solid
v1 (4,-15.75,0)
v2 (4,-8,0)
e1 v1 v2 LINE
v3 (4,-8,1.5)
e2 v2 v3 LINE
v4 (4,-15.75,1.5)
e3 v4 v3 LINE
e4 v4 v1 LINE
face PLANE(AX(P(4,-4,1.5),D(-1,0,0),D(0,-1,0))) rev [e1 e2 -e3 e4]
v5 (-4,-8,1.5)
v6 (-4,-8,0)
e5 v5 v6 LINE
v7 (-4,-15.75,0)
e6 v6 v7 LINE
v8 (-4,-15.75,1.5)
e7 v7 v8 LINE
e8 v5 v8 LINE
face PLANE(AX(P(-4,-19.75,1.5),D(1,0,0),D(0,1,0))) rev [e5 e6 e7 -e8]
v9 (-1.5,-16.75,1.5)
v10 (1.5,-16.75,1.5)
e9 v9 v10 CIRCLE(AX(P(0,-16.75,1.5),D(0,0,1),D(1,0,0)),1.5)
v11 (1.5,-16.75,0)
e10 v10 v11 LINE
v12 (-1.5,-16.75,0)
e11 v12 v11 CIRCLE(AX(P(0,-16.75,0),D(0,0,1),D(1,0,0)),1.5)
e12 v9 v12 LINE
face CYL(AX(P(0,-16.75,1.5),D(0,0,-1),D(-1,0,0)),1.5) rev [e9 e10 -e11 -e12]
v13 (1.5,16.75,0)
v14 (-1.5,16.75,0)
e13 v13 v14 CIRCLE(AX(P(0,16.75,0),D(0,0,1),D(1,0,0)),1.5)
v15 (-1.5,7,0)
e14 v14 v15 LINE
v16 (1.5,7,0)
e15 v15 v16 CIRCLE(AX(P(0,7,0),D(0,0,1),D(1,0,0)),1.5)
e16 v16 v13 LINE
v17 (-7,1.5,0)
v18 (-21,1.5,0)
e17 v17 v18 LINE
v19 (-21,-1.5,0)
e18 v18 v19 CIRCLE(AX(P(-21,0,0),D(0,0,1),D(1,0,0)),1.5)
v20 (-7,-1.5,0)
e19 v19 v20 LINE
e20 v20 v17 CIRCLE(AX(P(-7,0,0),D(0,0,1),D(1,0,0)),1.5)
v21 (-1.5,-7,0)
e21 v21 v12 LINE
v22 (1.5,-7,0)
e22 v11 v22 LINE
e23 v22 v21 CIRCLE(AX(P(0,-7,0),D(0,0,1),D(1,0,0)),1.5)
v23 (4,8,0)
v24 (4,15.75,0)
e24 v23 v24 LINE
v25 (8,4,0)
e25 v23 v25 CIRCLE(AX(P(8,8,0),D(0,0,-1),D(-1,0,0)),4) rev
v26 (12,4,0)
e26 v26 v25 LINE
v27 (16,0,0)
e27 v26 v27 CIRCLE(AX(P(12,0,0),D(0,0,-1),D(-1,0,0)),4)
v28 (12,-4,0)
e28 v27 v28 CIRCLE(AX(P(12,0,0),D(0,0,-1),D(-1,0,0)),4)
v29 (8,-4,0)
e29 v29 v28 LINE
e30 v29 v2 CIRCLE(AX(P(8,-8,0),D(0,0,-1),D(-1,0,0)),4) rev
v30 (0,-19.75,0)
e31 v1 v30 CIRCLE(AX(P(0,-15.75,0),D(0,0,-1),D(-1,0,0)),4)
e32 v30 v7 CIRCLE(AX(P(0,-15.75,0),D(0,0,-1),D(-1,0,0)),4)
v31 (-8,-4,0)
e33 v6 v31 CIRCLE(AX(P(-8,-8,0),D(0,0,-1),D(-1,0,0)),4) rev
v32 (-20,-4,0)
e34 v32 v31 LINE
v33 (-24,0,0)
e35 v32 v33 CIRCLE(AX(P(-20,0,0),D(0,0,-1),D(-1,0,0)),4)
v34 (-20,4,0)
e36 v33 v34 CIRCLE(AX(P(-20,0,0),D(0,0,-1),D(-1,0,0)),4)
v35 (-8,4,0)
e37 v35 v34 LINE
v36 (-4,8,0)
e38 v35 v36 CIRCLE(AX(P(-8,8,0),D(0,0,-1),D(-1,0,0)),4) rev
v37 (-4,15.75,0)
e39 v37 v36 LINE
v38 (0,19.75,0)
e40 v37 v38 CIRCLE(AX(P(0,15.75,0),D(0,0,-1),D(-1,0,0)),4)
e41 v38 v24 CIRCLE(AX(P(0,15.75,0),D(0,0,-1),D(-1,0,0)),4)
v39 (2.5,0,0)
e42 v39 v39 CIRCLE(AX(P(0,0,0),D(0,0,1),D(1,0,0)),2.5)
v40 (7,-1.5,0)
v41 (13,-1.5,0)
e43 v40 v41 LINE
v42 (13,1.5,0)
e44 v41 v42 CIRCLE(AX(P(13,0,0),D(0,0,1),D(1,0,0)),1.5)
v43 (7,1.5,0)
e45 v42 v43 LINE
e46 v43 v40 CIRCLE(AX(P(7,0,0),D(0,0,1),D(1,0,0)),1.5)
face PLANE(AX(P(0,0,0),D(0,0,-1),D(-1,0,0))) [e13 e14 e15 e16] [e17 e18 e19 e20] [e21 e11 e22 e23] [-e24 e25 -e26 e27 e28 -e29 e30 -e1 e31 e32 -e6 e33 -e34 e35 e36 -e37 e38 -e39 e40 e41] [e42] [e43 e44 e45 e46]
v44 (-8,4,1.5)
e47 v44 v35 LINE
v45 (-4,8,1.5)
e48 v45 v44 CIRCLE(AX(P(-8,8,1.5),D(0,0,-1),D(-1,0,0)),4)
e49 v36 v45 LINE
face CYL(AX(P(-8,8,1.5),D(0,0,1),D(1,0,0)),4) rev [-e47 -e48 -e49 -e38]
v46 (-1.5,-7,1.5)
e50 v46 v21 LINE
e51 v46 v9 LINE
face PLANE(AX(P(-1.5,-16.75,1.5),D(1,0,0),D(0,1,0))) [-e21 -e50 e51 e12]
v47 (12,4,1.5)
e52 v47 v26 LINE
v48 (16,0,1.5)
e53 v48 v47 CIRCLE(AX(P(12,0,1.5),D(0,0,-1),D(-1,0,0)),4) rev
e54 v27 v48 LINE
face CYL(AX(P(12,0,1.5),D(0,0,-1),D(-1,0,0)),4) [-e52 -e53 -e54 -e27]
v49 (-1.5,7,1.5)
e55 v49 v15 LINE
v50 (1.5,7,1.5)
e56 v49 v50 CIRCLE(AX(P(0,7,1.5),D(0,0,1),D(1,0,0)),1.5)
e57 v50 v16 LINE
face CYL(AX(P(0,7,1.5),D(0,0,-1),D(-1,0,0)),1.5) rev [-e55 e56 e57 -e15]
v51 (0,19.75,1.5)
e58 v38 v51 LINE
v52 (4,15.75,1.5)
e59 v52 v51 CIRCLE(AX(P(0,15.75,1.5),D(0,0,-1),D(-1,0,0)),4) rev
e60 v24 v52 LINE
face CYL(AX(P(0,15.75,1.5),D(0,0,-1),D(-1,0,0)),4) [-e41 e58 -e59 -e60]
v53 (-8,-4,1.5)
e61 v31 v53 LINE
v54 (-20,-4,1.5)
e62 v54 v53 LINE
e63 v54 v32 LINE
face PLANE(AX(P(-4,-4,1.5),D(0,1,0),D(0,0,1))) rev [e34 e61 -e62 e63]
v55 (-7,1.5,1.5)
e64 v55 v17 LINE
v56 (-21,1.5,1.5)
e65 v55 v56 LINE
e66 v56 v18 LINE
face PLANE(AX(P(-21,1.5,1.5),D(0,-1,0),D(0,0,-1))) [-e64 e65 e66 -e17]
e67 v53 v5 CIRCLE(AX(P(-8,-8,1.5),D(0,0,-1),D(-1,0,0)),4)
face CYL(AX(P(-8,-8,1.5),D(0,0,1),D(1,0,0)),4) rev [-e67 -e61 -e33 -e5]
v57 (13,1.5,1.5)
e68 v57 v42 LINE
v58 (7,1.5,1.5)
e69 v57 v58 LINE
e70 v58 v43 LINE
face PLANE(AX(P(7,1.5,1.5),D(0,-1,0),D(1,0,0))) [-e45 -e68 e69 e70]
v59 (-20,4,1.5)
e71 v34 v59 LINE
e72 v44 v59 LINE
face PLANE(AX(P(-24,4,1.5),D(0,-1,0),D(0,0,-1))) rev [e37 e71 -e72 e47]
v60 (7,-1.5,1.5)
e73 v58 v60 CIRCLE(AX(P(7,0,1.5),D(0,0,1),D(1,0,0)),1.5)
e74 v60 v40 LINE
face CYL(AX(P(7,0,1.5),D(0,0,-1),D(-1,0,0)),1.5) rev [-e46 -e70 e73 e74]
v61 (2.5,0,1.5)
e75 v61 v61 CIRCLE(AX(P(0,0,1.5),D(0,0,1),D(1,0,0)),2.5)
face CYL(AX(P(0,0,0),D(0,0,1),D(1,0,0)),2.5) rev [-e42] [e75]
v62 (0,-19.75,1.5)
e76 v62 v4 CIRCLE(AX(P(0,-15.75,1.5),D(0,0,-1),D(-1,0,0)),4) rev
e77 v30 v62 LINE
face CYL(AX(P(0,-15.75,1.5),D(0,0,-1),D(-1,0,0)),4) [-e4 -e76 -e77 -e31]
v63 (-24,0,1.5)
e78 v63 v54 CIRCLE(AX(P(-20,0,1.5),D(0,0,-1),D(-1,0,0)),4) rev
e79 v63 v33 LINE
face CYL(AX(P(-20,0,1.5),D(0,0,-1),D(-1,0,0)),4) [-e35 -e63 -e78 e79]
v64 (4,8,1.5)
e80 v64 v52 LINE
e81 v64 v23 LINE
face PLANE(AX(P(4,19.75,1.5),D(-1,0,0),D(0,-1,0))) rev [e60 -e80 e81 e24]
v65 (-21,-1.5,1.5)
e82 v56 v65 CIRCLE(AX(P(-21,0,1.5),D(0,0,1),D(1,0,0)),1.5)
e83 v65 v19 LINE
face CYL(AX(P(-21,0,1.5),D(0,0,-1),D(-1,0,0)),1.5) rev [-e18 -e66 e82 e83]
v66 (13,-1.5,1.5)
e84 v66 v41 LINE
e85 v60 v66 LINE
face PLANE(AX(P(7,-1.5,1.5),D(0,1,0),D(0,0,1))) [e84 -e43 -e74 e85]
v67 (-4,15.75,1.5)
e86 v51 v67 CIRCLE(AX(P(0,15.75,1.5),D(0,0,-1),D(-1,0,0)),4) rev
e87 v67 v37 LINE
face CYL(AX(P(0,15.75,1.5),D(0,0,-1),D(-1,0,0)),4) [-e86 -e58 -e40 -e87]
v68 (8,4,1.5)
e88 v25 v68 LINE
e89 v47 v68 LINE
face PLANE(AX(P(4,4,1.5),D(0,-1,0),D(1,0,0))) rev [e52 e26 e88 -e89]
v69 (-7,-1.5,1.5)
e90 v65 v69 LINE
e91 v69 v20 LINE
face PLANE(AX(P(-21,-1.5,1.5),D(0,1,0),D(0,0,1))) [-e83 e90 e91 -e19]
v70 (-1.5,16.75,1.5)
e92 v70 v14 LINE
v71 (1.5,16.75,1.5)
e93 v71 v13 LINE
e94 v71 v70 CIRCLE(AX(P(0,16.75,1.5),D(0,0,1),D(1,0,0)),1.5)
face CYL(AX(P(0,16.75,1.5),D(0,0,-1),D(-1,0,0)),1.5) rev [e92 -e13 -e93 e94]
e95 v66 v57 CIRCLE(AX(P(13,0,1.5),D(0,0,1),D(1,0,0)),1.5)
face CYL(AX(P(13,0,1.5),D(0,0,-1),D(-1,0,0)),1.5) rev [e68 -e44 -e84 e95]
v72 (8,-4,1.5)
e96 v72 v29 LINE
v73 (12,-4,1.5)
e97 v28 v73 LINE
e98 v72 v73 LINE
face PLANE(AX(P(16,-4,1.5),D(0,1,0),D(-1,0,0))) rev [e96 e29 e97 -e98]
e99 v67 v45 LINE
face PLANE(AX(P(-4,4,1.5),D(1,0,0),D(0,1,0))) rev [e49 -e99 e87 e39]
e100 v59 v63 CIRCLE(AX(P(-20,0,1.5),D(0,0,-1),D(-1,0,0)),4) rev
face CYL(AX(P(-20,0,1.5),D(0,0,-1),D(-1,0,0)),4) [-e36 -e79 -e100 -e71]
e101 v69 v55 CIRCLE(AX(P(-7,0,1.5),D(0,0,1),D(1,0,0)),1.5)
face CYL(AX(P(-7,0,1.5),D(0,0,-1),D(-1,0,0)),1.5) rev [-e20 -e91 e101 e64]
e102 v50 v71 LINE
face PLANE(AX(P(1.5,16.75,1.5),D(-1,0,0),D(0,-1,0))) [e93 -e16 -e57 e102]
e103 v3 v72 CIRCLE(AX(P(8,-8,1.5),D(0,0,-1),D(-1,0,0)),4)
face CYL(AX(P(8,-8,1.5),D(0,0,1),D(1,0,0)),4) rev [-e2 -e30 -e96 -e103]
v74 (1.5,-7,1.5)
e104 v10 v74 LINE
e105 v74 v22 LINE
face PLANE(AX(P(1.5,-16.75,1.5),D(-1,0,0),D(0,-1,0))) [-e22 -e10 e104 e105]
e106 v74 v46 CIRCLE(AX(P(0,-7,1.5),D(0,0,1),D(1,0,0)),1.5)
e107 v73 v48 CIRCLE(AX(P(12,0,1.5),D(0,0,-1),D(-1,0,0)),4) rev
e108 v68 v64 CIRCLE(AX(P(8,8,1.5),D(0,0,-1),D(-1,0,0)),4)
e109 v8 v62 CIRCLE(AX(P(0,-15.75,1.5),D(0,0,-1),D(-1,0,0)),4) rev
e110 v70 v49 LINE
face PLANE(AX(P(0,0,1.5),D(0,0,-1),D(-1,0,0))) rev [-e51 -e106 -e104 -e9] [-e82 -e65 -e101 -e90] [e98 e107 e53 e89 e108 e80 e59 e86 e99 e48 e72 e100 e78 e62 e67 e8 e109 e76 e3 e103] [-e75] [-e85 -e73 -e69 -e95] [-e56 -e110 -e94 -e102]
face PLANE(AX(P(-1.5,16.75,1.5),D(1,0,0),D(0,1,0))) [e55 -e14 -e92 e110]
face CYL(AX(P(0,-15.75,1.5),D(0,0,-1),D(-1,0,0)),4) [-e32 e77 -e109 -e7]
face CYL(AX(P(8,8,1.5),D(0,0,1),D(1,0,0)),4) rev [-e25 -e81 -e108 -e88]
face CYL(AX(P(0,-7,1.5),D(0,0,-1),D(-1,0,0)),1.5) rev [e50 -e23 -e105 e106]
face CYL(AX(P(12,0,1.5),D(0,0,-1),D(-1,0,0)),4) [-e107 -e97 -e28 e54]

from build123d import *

# Parameters (mm, degrees)
EXTRUDE_2_DEPTH     = 1.5
FILLET_1_DEPTH      = 1.5
FILLET_1_2_DEPTH    = 1.5
SKETCH_3_R          = 2.5
CUT_EXTRUDE_2_DEPTH = 1.5
FILLET_2_R          = 4


with BuildPart() as part:
    # 草图1 → 凸台-拉伸2 (new body)
    with BuildSketch(Plane.XY):
        Polygon((-24, 4), (-4, 4), (-4, 19.75), (4, 19.75), (4, 4), (16, 4), (16, -4), (4, -4), (4, -19.75), (-4, -19.75), (-4, -4), (-24, -4), align=None)
        with BuildLine():
            Line((-21, 1.5), (-7, 1.5))
            ThreePointArc((-7, 1.5), (-5.5, 0), (-7, -1.5))
            Line((-7, -1.5), (-21, -1.5))
            ThreePointArc((-21, -1.5), (-22.5, 0), (-21, 1.5))
        make_face(mode=Mode.SUBTRACT)
        with BuildLine():
            Line((7, 1.5), (13, 1.5))
            ThreePointArc((13, 1.5), (14.5, 0), (13, -1.5))
            Line((13, -1.5), (7, -1.5))
            ThreePointArc((7, -1.5), (5.5, 0), (7, 1.5))
        make_face(mode=Mode.SUBTRACT)
        with BuildLine():
            Line((-1.5, -16.75), (-1.5, -7))
            ThreePointArc((-1.5, -7), (0, -5.5), (1.5, -7))
            Line((1.5, -7), (1.5, -16.75))
            ThreePointArc((1.5, -16.75), (0, -18.25), (-1.5, -16.75))
        make_face(mode=Mode.SUBTRACT)
        with BuildLine():
            Line((1.5, 16.75), (1.5, 7))
            ThreePointArc((1.5, 7), (0, 5.5), (-1.5, 7))
            Line((-1.5, 7), (-1.5, 16.75))
            ThreePointArc((-1.5, 16.75), (0, 18.25), (1.5, 16.75))
        make_face(mode=Mode.SUBTRACT)
    extrude(amount=EXTRUDE_2_DEPTH)

    # 圆角1: read off the stored shape, not the designer's step
    # 圆角1 outline → 圆角1 (cut)
    with BuildSketch(Plane.XY):
        with BuildLine():
            ThreePointArc((4, -15.75), (2.828427125, -18.578427125), (0, -19.75))
            Line((0, -19.75), (4, -19.75))
            Line((4, -19.75), (4, -15.75))
        make_face()
        with BuildLine():
            ThreePointArc((0, -19.75), (-2.828427125, -18.578427125), (-4, -15.75))
            Line((-4, -15.75), (-4, -19.75))
            Line((-4, -19.75), (0, -19.75))
        make_face()
        with BuildLine():
            ThreePointArc((-4, 15.75), (-2.828427125, 18.578427125), (0, 19.75))
            Line((0, 19.75), (-4, 19.75))
            Line((-4, 19.75), (-4, 15.75))
        make_face()
        with BuildLine():
            ThreePointArc((0, 19.75), (2.828427125, 18.578427125), (4, 15.75))
            Line((4, 15.75), (4, 19.75))
            Line((4, 19.75), (0, 19.75))
        make_face()
    extrude(amount=FILLET_1_DEPTH, mode=Mode.SUBTRACT)

    # Fillet 1 2 outline → Fillet 1 2 (add)
    with BuildSketch(Plane.XY):
        with BuildLine():
            Line((4, -4), (4, -8))
            ThreePointArc((4, -8), (5.171572875, -5.171572875), (8, -4))
            Line((8, -4), (4, -4))
        make_face()
        with BuildLine():
            ThreePointArc((-8, -4), (-5.171572875, -5.171572875), (-4, -8))
            Line((-4, -8), (-4, -4))
            Line((-4, -4), (-8, -4))
        make_face()
        with BuildLine():
            Line((-4, 4), (-4, 8))
            ThreePointArc((-4, 8), (-5.171572875, 5.171572875), (-8, 4))
            Line((-8, 4), (-4, 4))
        make_face()
        with BuildLine():
            ThreePointArc((8, 4), (5.171572875, 5.171572875), (4, 8))
            Line((4, 8), (4, 4))
            Line((4, 4), (8, 4))
        make_face()
    extrude(amount=FILLET_1_2_DEPTH)

    # 草图3 → 切除-拉伸2 (cut)
    with BuildSketch(Plane.XY.offset(1.5)):
        Circle(SKETCH_3_R)
    extrude(amount=-CUT_EXTRUDE_2_DEPTH, mode=Mode.SUBTRACT)

    # 圆角2
    fillet_2_edges = [part.edges().sort_by_distance(p)[0] for p in [
        (-24, -4, 0.75),
        (-24, 4, 0.75),
        (16, -4, 0.75),
        (16, 4, 0.75),
    ]]
    fillet(fillet_2_edges, radius=FILLET_2_R - 0.0001)  # a hair under: the kernel refuses the full size


solid = part.part
